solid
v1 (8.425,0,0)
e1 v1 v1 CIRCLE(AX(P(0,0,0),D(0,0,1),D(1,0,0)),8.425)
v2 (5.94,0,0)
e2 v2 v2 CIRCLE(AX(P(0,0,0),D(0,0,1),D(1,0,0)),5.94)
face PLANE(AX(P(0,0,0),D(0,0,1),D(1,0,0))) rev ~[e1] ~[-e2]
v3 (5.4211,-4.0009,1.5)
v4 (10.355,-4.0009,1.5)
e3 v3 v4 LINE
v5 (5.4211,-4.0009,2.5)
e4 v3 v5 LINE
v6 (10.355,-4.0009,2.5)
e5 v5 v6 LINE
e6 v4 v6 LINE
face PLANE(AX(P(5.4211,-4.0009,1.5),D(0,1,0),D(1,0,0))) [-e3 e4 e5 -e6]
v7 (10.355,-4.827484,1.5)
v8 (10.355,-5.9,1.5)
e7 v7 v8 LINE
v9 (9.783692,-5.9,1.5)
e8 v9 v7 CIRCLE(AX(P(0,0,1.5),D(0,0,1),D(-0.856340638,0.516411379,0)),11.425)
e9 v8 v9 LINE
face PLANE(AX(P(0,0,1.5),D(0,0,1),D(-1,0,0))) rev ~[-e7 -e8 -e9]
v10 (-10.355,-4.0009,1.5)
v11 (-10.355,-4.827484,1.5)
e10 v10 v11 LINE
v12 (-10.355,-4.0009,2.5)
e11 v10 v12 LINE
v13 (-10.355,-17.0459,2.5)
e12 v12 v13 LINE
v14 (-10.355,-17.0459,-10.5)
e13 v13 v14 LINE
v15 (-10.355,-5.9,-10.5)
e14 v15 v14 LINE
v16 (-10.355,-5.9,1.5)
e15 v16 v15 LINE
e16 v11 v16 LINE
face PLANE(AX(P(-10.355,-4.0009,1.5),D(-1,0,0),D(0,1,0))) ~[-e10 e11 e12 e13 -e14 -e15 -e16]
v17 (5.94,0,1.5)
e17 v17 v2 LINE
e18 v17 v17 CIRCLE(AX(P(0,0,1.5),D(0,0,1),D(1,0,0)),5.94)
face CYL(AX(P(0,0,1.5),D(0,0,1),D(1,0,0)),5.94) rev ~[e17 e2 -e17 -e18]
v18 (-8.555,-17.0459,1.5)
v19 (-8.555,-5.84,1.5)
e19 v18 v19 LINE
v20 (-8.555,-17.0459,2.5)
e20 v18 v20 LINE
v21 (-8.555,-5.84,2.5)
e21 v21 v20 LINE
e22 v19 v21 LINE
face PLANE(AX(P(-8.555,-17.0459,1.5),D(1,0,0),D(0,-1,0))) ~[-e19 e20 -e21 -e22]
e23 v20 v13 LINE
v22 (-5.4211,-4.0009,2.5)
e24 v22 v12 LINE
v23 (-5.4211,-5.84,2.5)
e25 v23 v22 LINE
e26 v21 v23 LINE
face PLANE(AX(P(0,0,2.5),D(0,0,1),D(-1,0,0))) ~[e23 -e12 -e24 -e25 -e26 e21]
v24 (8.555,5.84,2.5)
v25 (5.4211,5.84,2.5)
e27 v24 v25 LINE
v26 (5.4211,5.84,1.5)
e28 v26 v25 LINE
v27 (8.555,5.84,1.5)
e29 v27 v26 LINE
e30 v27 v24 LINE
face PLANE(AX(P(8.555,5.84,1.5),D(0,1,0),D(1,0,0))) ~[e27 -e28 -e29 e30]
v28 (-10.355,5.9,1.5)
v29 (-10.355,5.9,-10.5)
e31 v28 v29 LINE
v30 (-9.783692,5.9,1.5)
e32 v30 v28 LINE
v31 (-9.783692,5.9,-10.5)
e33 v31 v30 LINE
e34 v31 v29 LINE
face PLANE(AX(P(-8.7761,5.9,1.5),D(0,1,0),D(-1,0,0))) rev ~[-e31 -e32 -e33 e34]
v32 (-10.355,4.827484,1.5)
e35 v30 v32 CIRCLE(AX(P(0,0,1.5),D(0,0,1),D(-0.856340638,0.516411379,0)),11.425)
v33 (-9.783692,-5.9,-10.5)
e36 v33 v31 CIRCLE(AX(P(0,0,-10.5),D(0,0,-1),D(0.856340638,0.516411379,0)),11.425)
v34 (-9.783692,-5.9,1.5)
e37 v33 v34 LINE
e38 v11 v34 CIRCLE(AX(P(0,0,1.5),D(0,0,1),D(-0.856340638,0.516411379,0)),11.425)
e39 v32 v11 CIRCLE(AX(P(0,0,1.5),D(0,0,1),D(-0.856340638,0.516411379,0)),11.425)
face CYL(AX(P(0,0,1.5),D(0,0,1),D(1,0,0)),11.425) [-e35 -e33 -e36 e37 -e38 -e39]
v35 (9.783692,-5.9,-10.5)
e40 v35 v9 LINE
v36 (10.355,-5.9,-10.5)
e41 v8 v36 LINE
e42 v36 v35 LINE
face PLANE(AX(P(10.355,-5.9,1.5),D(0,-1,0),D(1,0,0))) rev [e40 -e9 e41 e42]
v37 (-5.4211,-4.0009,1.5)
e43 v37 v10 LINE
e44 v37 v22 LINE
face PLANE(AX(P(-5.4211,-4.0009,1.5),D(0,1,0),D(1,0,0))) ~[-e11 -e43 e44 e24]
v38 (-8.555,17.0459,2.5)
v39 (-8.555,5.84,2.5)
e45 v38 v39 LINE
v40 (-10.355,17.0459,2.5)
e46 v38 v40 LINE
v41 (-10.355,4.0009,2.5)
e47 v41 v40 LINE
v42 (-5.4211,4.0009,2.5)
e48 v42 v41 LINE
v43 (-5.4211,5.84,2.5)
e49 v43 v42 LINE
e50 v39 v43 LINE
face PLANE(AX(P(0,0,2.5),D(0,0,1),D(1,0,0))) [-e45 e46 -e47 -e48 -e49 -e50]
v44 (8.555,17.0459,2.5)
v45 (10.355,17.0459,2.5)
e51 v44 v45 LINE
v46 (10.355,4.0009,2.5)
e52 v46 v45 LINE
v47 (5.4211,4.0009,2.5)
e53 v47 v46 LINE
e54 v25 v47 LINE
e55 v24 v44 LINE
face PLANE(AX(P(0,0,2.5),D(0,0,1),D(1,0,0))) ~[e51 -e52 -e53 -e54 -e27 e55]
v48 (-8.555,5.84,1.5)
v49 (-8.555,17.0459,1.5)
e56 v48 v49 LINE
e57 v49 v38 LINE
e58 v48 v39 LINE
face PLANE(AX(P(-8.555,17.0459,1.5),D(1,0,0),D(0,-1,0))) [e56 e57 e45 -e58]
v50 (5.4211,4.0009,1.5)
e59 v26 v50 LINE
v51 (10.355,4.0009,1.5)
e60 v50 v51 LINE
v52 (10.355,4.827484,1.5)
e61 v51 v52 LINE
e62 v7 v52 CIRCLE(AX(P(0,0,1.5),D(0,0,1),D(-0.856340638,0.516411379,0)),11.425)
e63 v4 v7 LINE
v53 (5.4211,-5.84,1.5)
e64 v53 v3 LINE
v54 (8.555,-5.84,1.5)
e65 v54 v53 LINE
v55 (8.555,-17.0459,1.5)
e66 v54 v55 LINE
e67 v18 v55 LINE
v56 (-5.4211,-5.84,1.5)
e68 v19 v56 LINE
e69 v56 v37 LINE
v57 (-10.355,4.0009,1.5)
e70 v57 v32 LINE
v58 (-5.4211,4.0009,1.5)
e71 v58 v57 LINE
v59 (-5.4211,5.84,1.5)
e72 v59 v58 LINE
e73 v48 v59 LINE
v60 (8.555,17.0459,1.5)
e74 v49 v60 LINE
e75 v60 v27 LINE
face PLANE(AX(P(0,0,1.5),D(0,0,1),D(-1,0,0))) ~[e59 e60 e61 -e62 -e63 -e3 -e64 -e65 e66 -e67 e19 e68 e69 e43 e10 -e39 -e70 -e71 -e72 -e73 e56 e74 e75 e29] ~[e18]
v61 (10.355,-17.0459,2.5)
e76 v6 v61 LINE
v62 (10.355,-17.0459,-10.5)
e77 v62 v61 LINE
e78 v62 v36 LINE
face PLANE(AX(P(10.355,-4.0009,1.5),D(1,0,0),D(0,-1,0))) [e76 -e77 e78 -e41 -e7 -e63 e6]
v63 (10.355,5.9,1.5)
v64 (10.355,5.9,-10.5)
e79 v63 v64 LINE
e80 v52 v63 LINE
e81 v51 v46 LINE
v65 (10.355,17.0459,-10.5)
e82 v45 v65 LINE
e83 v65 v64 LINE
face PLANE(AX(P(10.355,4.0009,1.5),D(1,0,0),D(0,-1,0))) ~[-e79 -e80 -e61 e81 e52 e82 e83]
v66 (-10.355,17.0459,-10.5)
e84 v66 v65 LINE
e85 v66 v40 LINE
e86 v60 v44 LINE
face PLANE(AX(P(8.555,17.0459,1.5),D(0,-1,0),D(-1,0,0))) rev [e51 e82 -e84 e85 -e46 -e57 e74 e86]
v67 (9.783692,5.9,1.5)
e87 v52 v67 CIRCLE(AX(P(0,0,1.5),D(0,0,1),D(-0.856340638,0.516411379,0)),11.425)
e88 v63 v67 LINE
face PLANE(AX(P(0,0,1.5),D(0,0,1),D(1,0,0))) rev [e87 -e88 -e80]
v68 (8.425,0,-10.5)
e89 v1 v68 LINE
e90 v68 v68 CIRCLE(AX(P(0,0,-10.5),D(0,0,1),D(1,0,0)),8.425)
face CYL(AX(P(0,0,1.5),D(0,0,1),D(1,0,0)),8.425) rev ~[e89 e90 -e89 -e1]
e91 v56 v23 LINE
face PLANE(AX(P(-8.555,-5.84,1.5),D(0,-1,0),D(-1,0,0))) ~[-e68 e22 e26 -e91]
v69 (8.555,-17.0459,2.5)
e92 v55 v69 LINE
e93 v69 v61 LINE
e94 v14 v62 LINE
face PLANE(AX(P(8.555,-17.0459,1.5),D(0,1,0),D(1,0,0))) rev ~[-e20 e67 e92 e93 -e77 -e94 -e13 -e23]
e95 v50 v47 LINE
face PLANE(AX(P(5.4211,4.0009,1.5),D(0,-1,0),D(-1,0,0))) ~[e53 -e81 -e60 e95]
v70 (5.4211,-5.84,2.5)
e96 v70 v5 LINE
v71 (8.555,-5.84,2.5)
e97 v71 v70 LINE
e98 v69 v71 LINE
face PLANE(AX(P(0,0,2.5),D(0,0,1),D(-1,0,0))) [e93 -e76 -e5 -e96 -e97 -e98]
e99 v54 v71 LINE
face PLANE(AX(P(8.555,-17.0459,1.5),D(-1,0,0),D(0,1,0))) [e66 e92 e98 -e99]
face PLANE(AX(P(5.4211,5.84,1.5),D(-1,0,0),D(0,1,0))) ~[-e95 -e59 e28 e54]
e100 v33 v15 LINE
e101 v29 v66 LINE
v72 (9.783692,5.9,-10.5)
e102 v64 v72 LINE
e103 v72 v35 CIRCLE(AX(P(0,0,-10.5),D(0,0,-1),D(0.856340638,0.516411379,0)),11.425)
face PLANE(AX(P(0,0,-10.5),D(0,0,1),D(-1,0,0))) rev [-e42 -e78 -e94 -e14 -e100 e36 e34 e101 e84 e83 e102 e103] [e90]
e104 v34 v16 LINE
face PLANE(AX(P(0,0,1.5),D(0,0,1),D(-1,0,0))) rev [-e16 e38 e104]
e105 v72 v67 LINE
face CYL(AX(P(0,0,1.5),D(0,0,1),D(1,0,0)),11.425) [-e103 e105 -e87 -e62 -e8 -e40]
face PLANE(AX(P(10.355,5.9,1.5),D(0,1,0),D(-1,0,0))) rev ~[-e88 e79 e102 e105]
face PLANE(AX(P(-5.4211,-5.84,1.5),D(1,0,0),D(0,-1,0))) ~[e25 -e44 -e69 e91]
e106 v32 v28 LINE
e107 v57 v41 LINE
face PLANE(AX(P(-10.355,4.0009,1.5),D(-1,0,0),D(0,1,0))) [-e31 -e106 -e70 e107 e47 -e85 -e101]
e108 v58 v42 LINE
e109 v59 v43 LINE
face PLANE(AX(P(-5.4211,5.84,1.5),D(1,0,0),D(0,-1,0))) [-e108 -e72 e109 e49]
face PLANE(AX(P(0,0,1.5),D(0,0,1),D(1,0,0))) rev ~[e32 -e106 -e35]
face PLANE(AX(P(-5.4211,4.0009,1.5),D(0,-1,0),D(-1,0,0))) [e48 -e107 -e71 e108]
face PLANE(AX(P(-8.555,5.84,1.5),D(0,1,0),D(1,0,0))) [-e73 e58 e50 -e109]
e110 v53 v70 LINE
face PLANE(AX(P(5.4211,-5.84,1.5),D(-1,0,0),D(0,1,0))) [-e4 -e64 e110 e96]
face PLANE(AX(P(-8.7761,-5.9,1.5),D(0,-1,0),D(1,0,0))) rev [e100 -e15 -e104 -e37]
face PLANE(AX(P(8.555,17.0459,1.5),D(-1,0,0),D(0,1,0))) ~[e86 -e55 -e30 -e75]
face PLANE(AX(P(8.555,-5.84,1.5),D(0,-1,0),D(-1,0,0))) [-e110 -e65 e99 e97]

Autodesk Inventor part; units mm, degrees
ref_plane "YZ Plane" through (0, 0, 0) normal (1, 0, 0) x (0, 1, 0)
ref_plane "XZ Plane" through (0, 0, 0) normal (0, 1, 0) x (-1, 0, 0)
ref_plane "XY Plane" through (0, 0, 0) normal (0, 0, 1) x (1, 0, 0)
sketch "Sketch1" plane through (0, 0, 0) normal (0, 0, 1) x (1, 0, 0)
  circle A0 centre (0, 0) radius 7.925 projected
  circle A1 centre (0, 0) radius 8.425
  point P0 (0, 0)
  dimension "d0" = 0.5
extrude "Extrusion1" add sketch "Sketch1" along normal blind 1.5 contours A0 | A1
sketch "Sketch2" plane through (0, 0, 1.5) normal (0, 0, 1) x (1, 0, 0)
  circle A0 centre (0, 0) radius 8.425 projected
  circle A1 centre (0, 0) radius 11.425
  dimension "d3" = 3
extrude "Extrusion2" add sketch "Sketch2" against normal blind 12
sketch "Sketch3" plane through (0, 0, 1.5) normal (0, 0, 1) x (1, 0, 0)
  circle A0 centre (0, 0) radius 6.94 projected
  circle A1 centre (0, 0) radius 5.94
  dimension "d6" = 1
extrude "Extrusion3" cut sketch "Sketch3" against normal through all contours A1
sketch "Sketch4" plane through (0, 0, 1.5) normal (0, 0, 1) x (1, 0, 0)
  line L0 (-8.355, 16.96) -> (-8.355, 7.9) projected
  line L1 (8.355, 7.9) -> (8.355, 16.96) projected
  line L2 (-10.355, 17.0459) -> (10.355, 17.0459)
  line L3 (10.355, 17.0459) -> (10.355, 5.9)
  line L4 (-10.355, 5.9) -> (-10.355, 17.0459)
  circle A0 centre (0, 0) radius 10.575 projected
  line L5 (-8.7761, 5.9) -> (-10.355, 5.9)
  line L6 (10.355, 5.9) -> (8.7761, 5.9)
  arc A1 (8.7761, 5.9) -> (-8.7761, 5.9) centre (0, 0) ccw
extrude "Extrusion4" add sketch "Sketch4" against normal up to surface (12 mm away) contours L2 L3 L6 A0 L5 L4
sketch "Sketch5" plane through (0, 0, 1.5) normal (0, 0, 1) x (1, 0, 0)
  line L0 (10.355, 17.0459) -> (-10.355, 17.0459) projected
  line L1 (-8.355, 16.96) -> (-8.355, 7.9) projected
  line L2 (8.355, 7.9) -> (8.355, 16.96) projected
  line L3 (-6.395, 5.94) -> (6.395, 5.94) projected
  line L4 (-8.555, 17.0459) -> (-8.555, 7.9)
  line L5 (-8.555, 7.9) -> (-8.555, 5.94)
  line L6 (-8.555, 5.94) -> (-8.555, 5.84)
  line L7 (-8.555, 5.84) -> (-5.4211, 5.84)
  line L8 (-5.4211, 5.84) -> (-5.4211, 4.0009)
  line L9 (-5.4211, 4.0009) -> (-10.355, 4.0009)
  line L10 (-10.355, 4.0009) -> (-10.355, 17.0459)
  line L11 (-10.355, 17.0459) -> (-8.555, 17.0459)
  dimension "d12" = 0.2
  dimension "d13" = 0.1
extrude "Extrusion5" add sketch "Sketch5" along normal blind 1
sketch "Sketch6" plane through (0, 0, 2.5) normal (0, 0, 1) x (1, 0, 0)
  line L0 (-10.355, 4.0009) -> (-5.4211, 4.0009)
  line L1 (-5.4211, 4.0009) -> (-5.4211, 13.0009)
  line L2 (-5.4211, 13.0009) -> (-10.355, 13.0009)
  line L3 (-10.355, 13.0009) -> (-10.355, 4.0009)
  point P0 (0, 0)
  dimension "d18" = 9
extrude "Extrusion6" [suppressed]
mirror "Mirror1" about plane through (0, 0, 0) normal (1, 0, 0) of "Extrusion5"
mirror "Mirror2" about plane through (0, 0, 0) normal (0, 1, 0) of "Extrusion5", "Mirror1", "Extrusion4"
properties part number "PI_holder"
